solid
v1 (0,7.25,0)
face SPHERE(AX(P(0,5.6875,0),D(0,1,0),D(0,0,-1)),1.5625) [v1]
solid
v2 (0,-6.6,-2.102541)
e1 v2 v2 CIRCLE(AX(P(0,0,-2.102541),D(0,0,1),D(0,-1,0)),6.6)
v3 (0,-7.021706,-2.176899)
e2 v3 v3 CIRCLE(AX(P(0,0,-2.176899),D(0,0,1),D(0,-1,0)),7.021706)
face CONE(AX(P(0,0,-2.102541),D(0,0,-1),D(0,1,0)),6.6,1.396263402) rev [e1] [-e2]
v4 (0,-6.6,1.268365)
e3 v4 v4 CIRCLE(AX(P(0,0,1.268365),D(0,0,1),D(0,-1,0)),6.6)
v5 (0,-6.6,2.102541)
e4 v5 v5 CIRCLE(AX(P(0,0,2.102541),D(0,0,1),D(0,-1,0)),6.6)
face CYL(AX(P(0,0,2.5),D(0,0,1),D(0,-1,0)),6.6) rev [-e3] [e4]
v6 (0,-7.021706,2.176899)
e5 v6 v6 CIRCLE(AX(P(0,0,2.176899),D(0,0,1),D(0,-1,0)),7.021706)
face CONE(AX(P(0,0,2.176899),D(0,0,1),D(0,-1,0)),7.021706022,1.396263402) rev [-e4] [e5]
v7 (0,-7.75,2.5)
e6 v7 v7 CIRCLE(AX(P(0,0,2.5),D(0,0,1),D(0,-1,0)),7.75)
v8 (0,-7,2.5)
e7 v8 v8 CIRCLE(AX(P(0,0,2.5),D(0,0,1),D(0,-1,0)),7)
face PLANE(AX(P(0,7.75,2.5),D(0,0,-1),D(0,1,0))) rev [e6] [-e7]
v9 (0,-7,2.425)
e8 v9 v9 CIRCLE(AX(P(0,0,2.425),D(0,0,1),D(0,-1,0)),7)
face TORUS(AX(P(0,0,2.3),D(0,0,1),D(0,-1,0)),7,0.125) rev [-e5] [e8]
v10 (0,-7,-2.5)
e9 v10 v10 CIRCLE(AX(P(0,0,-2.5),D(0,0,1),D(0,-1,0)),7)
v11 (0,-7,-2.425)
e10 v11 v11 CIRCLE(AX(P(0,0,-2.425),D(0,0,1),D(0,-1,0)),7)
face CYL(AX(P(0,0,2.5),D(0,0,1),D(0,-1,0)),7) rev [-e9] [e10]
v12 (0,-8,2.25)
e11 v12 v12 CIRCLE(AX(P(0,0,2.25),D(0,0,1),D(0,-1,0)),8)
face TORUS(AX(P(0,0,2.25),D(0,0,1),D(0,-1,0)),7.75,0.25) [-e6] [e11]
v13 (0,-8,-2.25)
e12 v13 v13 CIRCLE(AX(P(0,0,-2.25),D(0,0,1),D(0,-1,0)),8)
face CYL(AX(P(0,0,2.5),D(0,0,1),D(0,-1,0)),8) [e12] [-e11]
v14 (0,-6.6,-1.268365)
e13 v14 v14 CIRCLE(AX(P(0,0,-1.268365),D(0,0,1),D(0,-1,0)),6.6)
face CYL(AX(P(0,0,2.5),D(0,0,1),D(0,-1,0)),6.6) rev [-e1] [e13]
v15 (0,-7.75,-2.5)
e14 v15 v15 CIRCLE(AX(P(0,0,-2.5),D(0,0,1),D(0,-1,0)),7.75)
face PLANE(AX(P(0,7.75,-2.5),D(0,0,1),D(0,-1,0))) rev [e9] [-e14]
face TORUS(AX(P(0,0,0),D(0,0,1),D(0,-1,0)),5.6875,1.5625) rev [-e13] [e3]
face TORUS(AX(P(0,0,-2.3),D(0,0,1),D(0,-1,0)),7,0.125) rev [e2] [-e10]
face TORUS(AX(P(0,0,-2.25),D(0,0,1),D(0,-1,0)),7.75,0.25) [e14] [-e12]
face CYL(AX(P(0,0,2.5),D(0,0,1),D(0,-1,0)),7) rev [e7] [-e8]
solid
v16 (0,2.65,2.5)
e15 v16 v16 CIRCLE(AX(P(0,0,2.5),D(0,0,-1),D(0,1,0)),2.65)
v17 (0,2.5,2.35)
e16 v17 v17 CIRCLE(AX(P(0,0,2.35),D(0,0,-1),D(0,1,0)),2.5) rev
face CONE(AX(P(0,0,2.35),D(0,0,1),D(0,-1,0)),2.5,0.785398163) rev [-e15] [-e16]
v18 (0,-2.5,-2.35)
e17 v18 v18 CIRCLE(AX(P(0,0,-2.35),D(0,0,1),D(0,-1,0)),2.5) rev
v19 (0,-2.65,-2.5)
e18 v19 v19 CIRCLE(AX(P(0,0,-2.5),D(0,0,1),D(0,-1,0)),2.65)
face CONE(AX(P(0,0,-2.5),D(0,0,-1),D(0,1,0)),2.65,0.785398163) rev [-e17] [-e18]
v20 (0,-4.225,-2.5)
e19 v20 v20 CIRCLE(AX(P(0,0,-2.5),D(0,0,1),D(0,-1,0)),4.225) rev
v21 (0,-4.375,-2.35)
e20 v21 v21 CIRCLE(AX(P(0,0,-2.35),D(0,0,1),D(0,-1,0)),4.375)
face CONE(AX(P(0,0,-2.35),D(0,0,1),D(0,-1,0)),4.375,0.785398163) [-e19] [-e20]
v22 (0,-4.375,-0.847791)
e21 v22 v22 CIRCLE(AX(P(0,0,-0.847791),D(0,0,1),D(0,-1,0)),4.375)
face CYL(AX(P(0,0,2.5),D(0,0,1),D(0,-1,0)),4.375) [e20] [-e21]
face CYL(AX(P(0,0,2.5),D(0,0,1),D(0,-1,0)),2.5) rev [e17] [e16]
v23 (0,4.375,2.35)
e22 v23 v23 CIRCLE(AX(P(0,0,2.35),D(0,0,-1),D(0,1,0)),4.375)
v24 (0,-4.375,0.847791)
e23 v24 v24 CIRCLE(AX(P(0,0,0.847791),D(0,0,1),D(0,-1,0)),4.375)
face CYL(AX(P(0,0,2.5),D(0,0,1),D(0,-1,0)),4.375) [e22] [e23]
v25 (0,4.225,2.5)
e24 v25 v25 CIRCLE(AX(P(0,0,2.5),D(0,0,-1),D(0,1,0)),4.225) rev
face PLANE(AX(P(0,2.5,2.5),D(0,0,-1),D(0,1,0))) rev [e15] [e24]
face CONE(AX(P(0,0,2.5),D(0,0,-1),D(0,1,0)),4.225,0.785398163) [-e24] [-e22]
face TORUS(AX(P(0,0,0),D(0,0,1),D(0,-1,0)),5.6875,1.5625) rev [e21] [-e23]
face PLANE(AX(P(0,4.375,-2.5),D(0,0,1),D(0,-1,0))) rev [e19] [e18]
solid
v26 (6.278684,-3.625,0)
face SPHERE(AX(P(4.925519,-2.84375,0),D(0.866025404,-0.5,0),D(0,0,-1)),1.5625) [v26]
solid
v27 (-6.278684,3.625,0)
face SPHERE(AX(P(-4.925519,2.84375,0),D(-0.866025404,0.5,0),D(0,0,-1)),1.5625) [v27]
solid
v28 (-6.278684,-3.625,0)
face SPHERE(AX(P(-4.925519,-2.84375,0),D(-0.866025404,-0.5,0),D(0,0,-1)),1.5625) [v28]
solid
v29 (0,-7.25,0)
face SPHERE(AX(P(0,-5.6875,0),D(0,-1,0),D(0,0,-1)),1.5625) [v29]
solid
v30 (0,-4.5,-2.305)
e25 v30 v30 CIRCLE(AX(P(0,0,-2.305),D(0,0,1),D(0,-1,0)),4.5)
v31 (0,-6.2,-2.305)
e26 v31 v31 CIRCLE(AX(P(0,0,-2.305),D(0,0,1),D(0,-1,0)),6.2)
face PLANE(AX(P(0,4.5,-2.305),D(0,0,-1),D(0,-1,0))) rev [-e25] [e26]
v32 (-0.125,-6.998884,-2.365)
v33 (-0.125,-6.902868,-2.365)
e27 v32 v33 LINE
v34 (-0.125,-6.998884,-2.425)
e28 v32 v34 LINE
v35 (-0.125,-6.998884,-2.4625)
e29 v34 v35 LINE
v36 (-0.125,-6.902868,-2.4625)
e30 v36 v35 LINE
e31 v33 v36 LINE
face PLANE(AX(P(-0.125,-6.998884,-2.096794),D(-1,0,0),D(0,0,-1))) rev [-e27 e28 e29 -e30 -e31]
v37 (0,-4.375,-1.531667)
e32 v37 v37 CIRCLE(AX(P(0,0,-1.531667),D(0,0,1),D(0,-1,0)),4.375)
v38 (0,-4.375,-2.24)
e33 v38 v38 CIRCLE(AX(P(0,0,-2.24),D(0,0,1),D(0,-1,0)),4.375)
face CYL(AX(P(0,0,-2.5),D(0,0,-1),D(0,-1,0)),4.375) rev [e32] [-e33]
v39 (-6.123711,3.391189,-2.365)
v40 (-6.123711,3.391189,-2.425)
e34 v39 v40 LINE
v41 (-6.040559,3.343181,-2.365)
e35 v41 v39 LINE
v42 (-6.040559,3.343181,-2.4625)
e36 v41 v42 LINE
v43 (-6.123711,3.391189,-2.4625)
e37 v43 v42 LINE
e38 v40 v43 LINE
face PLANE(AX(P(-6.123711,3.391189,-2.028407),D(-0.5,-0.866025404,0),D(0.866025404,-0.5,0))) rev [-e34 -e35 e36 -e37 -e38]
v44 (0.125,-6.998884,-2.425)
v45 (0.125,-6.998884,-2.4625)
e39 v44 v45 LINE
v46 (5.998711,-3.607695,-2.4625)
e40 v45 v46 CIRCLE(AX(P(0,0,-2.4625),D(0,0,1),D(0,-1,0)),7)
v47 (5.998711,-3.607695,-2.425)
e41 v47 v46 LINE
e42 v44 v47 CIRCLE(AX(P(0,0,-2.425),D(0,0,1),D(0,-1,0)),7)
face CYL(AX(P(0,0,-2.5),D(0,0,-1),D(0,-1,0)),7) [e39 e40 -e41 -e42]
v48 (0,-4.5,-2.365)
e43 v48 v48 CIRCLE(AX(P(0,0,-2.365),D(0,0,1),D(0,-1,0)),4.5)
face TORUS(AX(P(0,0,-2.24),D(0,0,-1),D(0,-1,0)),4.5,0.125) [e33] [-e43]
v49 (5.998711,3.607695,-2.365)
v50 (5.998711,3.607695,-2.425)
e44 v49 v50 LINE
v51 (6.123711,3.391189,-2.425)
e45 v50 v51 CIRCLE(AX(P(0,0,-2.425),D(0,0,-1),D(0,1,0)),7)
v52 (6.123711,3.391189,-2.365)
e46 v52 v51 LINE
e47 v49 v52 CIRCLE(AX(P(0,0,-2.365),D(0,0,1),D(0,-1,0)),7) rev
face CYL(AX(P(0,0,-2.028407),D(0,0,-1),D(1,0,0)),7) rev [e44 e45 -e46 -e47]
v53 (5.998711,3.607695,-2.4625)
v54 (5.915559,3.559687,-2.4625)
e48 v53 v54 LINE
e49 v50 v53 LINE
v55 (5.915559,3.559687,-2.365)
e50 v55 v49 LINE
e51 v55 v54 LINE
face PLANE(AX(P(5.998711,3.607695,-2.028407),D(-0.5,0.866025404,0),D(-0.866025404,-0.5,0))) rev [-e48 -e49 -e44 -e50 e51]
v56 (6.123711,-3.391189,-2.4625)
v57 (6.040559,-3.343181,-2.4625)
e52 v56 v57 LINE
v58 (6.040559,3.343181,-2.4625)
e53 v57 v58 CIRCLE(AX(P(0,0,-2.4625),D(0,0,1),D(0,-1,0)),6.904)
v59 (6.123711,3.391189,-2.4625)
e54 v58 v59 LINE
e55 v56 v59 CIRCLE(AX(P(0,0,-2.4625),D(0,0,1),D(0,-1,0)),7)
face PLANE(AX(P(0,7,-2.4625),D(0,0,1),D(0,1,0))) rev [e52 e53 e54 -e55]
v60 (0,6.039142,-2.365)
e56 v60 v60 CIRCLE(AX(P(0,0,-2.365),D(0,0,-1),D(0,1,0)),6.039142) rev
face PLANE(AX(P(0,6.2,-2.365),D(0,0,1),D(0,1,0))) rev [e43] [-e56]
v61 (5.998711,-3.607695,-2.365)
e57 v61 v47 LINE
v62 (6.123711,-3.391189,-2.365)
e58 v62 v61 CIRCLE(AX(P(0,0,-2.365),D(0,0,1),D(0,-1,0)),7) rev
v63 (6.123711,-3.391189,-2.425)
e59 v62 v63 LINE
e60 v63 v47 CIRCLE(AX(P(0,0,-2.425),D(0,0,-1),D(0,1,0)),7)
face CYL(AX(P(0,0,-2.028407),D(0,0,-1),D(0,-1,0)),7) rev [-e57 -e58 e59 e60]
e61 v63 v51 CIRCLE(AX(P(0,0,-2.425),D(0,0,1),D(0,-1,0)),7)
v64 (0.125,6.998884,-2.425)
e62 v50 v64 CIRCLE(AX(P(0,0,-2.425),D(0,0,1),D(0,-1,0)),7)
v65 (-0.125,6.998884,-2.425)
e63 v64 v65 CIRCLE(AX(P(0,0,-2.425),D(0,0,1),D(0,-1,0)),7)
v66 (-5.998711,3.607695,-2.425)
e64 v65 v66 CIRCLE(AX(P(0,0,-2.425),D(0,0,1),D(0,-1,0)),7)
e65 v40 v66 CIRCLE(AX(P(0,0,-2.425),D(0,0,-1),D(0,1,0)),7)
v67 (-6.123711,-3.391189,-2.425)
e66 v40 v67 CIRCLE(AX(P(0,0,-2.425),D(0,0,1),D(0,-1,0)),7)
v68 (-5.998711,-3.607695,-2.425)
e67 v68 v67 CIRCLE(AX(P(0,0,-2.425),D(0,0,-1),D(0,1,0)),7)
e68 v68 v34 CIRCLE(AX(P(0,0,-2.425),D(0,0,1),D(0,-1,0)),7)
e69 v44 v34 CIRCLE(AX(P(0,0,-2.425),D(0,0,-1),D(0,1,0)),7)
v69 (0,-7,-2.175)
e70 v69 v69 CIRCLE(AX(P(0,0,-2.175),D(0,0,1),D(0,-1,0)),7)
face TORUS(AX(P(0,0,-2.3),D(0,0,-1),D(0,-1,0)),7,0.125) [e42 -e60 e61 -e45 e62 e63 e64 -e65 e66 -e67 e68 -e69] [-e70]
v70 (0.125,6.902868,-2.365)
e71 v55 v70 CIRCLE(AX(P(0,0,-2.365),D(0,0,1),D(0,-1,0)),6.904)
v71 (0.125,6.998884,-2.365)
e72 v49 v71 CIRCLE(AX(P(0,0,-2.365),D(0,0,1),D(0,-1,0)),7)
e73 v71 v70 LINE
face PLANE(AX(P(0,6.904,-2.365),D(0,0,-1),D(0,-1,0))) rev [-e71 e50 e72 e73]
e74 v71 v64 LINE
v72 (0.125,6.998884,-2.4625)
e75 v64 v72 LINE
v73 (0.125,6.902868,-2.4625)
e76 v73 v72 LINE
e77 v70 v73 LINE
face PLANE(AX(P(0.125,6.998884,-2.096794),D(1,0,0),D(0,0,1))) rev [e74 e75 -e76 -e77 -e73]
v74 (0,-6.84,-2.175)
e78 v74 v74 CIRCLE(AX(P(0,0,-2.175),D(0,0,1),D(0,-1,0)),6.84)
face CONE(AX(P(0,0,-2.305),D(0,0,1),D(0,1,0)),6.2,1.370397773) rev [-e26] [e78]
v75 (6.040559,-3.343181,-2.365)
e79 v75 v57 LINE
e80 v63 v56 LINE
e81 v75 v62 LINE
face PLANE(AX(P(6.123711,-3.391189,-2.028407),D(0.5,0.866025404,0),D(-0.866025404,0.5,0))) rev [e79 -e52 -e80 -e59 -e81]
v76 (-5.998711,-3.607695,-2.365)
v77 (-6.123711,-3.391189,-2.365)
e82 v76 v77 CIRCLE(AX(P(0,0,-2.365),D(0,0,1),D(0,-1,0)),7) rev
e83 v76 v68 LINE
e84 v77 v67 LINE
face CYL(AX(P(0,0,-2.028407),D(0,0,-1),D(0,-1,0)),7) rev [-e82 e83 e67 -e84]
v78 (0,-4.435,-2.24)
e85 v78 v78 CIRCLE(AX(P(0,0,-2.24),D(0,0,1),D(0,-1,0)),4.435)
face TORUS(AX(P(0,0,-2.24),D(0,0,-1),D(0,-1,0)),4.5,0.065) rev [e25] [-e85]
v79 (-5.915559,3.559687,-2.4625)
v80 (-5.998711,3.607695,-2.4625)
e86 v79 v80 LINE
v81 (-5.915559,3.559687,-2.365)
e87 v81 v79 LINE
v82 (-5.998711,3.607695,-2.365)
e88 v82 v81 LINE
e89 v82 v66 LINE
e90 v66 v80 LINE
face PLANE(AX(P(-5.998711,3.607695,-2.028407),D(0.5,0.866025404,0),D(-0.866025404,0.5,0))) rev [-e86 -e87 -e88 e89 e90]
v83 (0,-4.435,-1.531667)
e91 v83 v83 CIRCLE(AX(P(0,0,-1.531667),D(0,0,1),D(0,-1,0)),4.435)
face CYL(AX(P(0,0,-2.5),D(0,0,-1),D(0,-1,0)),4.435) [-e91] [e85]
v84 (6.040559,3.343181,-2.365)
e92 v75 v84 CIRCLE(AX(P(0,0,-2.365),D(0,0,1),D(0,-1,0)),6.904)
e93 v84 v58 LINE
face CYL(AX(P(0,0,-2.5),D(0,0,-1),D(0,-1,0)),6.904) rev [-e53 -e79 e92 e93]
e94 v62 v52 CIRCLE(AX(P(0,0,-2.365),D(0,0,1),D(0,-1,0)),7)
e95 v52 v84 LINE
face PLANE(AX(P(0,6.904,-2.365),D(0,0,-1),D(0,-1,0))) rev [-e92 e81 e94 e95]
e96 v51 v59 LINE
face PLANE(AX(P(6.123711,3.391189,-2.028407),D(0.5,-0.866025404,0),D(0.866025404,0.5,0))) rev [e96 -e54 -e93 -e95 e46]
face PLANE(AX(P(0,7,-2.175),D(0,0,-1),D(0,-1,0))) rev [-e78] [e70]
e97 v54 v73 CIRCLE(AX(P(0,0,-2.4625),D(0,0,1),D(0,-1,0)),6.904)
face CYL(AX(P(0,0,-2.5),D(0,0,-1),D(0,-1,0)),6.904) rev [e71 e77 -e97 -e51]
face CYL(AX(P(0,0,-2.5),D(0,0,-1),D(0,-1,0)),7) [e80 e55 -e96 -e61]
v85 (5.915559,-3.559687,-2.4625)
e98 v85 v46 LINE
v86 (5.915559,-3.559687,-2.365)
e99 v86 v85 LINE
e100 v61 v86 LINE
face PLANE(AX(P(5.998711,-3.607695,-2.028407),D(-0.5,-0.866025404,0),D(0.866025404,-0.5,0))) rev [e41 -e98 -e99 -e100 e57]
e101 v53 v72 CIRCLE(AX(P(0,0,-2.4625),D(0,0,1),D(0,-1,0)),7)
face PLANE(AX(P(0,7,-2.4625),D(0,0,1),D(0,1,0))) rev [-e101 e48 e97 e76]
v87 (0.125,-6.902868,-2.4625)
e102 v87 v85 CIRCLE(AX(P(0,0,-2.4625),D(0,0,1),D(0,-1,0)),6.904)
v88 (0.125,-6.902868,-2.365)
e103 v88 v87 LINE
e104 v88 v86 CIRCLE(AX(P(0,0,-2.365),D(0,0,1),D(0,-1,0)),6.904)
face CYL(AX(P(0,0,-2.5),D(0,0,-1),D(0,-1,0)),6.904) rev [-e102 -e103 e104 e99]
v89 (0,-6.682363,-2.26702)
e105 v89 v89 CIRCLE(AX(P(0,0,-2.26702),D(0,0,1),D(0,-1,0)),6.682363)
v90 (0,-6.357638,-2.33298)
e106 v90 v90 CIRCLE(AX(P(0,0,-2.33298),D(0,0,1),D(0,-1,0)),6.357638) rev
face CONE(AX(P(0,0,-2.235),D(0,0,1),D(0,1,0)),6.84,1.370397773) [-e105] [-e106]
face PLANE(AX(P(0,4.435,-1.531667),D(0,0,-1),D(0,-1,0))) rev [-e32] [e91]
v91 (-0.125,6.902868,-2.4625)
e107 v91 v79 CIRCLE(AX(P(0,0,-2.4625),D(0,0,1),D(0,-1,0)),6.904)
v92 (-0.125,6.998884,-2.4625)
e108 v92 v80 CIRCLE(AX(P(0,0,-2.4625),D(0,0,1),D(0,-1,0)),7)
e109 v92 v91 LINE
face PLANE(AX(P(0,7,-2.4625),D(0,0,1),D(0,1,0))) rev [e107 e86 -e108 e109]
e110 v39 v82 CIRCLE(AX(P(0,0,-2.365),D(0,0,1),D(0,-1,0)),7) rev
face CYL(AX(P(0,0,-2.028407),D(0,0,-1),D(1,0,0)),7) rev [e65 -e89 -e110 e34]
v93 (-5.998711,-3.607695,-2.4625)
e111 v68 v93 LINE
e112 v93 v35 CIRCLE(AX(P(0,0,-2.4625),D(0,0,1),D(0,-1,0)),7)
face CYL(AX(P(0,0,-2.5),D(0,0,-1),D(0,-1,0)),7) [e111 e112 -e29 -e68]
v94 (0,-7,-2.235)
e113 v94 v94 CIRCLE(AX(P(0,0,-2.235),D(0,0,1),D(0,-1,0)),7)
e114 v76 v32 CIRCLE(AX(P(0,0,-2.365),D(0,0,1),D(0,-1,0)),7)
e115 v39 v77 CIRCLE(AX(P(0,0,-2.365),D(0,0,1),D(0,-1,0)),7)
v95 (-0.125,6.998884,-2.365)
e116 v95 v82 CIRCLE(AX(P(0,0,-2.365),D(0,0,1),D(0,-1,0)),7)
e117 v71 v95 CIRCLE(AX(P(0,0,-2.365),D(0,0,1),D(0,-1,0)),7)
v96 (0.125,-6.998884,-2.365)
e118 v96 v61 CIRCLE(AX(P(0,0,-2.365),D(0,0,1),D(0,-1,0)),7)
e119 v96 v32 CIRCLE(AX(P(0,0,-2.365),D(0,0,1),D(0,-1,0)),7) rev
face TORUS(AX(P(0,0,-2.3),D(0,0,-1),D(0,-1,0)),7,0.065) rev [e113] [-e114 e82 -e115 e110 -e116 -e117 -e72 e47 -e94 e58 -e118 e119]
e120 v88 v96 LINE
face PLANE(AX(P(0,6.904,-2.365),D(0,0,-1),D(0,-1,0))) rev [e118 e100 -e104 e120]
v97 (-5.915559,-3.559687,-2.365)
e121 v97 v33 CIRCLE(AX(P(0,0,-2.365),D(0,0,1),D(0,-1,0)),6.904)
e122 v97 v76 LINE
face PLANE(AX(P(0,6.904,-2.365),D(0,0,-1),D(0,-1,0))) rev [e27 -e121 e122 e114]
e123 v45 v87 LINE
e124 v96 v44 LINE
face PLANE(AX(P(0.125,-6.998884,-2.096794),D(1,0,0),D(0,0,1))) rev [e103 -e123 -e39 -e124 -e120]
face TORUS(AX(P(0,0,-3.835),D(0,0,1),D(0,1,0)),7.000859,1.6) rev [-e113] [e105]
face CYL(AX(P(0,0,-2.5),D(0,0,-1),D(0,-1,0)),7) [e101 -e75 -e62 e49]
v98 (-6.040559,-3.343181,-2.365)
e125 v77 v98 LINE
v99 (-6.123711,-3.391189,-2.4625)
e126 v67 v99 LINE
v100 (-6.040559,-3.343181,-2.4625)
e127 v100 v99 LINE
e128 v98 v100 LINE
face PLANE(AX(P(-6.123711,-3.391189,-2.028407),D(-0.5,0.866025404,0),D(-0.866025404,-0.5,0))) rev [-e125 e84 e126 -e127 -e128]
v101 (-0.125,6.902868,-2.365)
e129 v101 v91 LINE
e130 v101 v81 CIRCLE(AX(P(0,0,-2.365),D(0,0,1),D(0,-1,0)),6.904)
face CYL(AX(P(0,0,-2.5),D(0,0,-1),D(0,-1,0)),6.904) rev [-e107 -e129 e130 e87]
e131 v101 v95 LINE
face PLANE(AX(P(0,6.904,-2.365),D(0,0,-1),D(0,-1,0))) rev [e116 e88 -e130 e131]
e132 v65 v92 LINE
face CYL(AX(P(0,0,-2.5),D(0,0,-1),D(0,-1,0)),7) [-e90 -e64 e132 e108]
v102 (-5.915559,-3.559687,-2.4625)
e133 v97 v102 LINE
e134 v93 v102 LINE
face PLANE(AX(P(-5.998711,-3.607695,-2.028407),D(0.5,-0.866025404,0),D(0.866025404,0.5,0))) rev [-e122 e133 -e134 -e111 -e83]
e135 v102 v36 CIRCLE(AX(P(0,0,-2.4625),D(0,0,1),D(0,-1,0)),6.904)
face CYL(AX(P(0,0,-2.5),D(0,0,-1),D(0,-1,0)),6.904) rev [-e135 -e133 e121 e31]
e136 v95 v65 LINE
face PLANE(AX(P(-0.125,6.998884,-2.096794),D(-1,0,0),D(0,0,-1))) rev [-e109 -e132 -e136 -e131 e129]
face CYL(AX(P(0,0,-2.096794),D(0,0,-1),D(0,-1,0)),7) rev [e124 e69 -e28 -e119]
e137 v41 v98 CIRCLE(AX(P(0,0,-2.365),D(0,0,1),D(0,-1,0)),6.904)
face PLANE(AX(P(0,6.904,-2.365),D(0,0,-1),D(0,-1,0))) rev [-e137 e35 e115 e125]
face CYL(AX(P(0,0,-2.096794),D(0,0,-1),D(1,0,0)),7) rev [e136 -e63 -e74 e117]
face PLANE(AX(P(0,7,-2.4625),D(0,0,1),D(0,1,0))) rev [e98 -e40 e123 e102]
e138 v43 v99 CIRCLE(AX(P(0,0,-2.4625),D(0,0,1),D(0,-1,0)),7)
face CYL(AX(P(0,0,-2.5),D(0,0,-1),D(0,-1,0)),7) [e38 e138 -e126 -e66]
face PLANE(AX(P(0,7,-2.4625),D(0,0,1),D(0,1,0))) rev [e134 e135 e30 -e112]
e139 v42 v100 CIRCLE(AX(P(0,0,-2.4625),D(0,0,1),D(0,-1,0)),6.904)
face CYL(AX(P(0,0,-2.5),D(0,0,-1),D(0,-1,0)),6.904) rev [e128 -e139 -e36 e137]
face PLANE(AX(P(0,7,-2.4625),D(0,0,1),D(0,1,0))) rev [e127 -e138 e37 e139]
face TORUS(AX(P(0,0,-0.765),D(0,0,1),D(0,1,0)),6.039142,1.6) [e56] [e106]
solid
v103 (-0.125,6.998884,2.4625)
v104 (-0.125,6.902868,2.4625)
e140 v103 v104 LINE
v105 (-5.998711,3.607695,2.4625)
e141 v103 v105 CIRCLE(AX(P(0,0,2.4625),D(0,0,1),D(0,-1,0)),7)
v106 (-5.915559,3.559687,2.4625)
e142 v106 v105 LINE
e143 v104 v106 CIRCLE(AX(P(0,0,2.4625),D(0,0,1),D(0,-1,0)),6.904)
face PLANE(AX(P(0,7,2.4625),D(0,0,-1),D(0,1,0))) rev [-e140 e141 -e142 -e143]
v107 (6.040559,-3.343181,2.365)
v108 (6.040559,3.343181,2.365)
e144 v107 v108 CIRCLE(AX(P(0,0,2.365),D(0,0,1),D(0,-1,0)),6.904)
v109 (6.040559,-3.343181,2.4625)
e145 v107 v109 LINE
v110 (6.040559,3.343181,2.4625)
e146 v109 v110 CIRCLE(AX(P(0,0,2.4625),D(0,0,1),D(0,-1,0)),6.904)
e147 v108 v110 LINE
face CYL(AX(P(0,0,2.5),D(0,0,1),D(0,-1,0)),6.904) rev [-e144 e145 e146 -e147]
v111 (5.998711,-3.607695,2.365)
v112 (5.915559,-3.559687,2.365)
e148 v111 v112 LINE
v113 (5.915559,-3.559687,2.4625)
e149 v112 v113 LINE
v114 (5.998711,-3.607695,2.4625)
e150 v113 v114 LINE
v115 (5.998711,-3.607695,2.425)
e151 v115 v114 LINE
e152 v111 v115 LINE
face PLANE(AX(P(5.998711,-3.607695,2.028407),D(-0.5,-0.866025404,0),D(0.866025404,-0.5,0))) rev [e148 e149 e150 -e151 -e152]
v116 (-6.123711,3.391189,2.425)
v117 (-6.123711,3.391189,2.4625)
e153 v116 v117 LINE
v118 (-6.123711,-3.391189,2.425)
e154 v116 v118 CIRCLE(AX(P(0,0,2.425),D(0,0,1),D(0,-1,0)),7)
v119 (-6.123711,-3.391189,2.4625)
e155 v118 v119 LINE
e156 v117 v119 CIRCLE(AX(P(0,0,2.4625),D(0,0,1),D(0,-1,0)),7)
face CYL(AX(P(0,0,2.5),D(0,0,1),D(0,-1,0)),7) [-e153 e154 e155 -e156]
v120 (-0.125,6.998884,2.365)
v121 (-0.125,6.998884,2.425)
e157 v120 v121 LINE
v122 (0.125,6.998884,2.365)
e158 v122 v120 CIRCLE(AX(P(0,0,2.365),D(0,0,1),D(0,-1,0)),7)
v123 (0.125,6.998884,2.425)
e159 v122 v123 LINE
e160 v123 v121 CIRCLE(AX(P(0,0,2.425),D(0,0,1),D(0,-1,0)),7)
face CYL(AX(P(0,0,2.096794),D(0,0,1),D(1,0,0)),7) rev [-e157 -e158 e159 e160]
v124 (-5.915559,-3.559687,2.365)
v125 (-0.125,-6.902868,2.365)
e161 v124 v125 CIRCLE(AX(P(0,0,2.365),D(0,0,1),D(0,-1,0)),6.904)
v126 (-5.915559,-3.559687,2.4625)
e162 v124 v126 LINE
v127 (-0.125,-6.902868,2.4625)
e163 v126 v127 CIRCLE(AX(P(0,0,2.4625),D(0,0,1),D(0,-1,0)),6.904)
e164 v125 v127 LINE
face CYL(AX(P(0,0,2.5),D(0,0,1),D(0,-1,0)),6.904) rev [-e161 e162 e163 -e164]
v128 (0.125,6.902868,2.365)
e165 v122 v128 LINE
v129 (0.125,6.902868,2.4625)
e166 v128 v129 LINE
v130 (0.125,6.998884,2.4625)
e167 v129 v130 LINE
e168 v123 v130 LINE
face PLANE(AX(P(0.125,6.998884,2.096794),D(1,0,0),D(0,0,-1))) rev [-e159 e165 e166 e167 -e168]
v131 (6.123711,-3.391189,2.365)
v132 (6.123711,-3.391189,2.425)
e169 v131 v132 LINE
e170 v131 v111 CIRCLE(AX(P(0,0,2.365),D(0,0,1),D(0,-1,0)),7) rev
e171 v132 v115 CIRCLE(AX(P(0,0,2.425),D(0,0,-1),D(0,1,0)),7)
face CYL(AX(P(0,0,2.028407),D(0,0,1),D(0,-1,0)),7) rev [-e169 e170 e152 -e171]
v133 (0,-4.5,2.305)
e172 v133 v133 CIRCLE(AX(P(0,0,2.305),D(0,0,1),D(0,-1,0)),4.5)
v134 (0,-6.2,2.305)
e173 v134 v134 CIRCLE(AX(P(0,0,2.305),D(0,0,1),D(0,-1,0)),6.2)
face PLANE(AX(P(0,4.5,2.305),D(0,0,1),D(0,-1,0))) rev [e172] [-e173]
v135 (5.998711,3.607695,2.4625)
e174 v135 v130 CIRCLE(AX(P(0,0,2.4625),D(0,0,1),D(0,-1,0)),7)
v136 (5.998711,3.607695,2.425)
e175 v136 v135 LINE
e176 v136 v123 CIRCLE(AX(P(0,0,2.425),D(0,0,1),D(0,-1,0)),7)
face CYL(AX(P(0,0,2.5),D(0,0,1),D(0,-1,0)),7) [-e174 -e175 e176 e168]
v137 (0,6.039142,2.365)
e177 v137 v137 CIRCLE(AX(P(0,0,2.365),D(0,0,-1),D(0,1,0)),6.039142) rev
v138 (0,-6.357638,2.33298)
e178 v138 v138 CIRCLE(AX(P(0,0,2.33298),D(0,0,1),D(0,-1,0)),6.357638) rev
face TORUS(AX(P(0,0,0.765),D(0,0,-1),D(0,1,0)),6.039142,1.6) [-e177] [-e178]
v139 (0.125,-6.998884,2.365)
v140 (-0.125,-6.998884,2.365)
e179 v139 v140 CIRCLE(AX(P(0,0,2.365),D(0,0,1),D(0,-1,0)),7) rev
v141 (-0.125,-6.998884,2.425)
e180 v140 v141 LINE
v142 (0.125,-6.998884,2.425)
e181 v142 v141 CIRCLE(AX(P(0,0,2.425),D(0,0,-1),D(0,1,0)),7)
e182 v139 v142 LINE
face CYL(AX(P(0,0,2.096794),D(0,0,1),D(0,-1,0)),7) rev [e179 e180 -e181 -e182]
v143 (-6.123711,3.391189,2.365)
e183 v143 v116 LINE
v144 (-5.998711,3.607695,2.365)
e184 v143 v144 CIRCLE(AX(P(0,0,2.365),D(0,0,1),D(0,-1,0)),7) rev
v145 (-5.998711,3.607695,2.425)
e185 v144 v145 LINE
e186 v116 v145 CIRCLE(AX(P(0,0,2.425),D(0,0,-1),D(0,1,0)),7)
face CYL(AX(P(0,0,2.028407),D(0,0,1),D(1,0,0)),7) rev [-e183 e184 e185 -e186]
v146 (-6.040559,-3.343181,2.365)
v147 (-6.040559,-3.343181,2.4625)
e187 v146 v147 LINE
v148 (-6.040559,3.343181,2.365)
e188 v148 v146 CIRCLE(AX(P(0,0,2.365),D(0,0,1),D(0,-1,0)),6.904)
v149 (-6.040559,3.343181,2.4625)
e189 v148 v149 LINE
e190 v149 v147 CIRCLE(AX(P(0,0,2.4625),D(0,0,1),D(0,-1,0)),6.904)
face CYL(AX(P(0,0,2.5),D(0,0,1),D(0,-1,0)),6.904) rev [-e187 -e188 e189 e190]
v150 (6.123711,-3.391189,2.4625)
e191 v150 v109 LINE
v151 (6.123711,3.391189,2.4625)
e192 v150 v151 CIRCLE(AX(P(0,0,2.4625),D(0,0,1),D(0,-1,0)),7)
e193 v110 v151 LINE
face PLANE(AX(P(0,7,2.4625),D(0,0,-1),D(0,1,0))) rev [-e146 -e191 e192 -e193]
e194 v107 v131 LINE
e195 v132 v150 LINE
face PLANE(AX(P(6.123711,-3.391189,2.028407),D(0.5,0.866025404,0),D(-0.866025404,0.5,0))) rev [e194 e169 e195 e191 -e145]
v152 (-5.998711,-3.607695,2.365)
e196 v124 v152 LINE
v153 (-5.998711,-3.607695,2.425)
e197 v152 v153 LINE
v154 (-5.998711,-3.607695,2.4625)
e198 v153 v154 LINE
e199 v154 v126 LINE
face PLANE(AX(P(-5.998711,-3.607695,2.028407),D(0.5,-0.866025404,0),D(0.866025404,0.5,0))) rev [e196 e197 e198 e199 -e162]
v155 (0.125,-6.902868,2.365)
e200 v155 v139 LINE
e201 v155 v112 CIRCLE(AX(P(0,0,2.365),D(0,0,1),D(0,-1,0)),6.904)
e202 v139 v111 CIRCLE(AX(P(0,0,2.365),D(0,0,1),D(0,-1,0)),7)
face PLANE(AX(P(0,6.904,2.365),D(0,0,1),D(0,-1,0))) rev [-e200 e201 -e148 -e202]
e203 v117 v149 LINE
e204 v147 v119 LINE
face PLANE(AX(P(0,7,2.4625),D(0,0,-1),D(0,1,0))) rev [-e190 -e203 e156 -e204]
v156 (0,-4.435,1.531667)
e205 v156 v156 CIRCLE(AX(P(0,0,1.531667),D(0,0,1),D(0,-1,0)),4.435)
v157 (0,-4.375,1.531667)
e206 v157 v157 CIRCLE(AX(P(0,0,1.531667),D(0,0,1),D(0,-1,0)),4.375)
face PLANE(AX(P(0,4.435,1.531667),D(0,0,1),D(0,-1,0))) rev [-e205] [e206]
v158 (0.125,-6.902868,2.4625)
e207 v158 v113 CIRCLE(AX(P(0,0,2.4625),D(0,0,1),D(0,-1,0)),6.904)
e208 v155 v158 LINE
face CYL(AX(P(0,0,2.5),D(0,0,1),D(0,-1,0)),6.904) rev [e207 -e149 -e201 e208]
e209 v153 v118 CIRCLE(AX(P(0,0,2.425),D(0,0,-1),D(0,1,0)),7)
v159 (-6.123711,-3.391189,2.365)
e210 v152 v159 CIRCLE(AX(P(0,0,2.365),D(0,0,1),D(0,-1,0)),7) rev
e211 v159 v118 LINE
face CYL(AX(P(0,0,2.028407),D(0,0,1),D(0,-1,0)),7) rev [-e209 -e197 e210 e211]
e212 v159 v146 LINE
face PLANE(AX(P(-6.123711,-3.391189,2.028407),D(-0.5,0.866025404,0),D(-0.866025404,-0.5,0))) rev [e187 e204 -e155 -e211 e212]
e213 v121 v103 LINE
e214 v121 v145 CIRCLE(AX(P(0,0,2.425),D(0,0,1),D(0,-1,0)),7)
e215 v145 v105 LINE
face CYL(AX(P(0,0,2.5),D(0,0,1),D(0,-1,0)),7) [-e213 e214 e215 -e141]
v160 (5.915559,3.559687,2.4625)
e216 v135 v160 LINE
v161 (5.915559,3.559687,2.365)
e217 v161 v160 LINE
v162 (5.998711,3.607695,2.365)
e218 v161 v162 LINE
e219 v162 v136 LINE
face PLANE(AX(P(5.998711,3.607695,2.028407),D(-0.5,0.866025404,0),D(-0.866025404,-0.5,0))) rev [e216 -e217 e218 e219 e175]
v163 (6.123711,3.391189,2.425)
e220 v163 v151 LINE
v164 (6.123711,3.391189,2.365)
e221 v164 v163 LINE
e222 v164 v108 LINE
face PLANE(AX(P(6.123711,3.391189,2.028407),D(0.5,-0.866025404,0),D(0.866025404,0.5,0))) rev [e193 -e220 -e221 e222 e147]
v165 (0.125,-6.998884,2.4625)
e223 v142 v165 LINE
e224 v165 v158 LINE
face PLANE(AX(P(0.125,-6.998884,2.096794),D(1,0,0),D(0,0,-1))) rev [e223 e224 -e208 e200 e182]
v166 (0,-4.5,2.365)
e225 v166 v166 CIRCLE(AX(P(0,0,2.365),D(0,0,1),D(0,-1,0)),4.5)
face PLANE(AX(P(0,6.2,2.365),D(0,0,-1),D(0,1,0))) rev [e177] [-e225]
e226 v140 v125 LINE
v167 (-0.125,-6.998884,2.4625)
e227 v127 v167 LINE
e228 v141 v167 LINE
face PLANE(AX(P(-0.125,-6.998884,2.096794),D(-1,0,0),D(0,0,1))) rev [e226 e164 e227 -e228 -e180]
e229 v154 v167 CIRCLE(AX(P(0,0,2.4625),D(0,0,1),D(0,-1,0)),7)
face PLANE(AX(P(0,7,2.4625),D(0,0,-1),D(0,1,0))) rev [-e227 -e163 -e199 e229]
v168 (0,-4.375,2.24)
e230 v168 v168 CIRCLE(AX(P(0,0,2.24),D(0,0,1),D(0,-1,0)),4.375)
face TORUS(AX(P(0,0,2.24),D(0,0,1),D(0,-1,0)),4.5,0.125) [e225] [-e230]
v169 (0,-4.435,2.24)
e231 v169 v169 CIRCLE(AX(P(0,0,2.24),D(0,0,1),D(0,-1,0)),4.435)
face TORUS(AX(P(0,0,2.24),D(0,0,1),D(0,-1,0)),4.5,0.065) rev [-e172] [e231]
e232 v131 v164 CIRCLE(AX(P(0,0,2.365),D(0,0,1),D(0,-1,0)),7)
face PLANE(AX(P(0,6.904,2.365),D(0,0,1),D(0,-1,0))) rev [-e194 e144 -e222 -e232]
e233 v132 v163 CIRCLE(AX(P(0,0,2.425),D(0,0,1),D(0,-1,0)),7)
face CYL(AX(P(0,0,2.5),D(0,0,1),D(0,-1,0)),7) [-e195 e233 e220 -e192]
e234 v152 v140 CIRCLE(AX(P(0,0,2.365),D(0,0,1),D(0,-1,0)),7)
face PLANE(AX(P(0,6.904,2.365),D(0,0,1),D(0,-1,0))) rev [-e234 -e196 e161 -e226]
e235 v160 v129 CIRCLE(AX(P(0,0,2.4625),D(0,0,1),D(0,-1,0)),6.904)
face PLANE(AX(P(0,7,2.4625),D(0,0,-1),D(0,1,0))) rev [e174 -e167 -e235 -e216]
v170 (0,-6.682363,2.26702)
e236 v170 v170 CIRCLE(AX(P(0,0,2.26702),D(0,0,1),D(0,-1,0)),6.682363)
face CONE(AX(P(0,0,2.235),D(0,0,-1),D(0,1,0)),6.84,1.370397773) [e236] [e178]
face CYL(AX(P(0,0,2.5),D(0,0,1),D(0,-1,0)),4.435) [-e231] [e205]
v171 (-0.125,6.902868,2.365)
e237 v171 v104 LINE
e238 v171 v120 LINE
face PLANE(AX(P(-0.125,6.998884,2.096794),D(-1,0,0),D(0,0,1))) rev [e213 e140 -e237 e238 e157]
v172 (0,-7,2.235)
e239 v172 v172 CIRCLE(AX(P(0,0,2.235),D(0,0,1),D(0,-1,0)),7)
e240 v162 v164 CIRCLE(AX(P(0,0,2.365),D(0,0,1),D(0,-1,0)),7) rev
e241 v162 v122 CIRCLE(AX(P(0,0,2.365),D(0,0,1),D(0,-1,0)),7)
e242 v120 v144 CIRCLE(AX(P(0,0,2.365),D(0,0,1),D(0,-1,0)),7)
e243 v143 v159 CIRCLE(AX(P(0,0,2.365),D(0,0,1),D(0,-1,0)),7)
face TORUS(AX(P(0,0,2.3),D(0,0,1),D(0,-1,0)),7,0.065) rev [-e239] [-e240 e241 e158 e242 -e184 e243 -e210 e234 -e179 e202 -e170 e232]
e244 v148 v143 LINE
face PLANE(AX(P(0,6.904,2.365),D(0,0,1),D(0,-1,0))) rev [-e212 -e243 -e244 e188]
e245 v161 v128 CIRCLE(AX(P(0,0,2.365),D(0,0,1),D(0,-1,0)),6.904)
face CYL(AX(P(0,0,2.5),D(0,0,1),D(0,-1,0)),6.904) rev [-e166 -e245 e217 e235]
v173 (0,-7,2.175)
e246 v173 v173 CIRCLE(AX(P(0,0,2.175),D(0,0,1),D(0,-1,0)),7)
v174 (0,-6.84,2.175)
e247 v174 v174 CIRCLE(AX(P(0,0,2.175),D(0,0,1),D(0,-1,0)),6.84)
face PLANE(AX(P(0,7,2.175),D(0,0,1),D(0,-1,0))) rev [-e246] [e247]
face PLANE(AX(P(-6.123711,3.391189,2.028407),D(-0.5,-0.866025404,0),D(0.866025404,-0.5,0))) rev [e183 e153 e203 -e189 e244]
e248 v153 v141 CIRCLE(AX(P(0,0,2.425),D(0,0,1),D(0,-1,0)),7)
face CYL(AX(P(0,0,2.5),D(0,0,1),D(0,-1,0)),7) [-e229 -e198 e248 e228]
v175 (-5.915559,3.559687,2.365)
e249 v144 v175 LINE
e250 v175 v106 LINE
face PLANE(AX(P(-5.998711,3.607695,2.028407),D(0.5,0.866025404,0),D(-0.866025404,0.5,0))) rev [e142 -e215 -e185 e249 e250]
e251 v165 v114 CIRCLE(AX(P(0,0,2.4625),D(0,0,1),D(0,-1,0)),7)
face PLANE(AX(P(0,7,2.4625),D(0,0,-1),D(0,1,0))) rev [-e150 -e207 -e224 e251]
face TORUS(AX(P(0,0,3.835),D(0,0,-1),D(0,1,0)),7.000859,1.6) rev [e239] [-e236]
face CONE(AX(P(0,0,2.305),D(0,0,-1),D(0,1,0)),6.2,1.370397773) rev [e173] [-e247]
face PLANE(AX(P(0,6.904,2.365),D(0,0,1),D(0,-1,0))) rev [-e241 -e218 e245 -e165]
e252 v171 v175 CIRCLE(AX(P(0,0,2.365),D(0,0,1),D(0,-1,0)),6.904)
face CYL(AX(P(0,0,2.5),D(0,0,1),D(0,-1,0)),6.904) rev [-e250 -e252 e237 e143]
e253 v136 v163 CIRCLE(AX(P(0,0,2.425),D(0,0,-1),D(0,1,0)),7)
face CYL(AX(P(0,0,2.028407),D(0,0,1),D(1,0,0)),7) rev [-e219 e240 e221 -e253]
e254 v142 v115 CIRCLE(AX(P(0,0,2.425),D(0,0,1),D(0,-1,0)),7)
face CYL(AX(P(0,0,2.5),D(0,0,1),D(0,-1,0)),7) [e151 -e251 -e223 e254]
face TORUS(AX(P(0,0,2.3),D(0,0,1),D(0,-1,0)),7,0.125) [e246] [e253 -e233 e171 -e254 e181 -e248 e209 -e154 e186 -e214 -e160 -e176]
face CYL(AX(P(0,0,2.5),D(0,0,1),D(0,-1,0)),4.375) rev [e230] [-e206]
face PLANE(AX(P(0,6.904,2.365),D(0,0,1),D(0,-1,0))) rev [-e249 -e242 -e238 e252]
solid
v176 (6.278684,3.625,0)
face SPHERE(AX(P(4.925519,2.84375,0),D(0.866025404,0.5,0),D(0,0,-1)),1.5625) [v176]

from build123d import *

# Parameters (mm, degrees)
CHAMFER1_SIZE      = 0.15
CIRPATTERN1_COUNT  = 6
CUT_EXTRUDE1_REACH = 14.354
CIRPATTERN2_COUNT  = 6


with BuildPart() as part:
    # Sketch3 → Revolve1 (revolve)
    with BuildSketch(Plane(origin=(0, 0, 0), x_dir=(0, 0, -1), z_dir=(1, 0, 0)), mode=Mode.PRIVATE) as revolve1_sk:
        with BuildLine():
            Line((-2.5, 2.5), (2.5, 2.5))
            Line((2.5, 2.5), (2.5, 4.375))
            Line((2.5, 4.375), (0.847791248, 4.375))
            ThreePointArc((0.847791248, 4.375), (0, 4.125), (-0.847791248, 4.375))
            Line((-0.847791248, 4.375), (-2.5, 4.375))
            Line((-2.5, 4.375), (-2.5, 2.5))
        make_face()
        with BuildLine():
            Line((2.5, 7), (2.425, 7))
            ThreePointArc((2.425, 7), (2.310894468, 7.124524337), (2.176899031, 7.021706022))
            Line((2.176899031, 7.021706022), (2.102540881, 6.6))
            Line((2.102540881, 6.6), (1.268365089, 6.6))
            ThreePointArc((1.268365089, 6.6), (0, 7.25), (-1.268365089, 6.6))
            Line((-1.268365089, 6.6), (-2.102540881, 6.6))
            Line((-2.102540881, 6.6), (-2.176899031, 7.021706022))
            ThreePointArc((-2.176899031, 7.021706022), (-2.310894468, 7.124524337), (-2.425, 7))
            Line((-2.425, 7), (-2.5, 7))
            Line((-2.5, 7), (-2.5, 7.75))
            ThreePointArc((-2.5, 7.75), (-2.426776695, 7.926776695), (-2.25, 8))
            Line((-2.25, 8), (2.25, 8))
            ThreePointArc((2.25, 8), (2.426776695, 7.926776695), (2.5, 7.75))
            Line((2.5, 7.75), (2.5, 7))
        make_face()
    revolve(revolve1_sk.sketch.rotate(Axis((0, 0, 2.5), (0, 0, -1)), 180), axis=Axis((0, 0, 2.5), (0, 0, -1)))

    # Chamfer1
    chamfer1_edges = [part.edges().sort_by_distance(p)[0] for p in [
        (0, 4.375, 2.5),
        (0, 4.375, -2.5),
        (0, 2.5, -2.5),
        (0, 2.5, 2.5),
    ]]
    chamfer(chamfer1_edges, length=CHAMFER1_SIZE)


with BuildPart() as body_2:
    # Sketch4 → Revolve2 (revolve)
    with BuildSketch(Plane(origin=(0, 0, 0), x_dir=(0, 0, -1), z_dir=(1, 0, 0)), mode=Mode.PRIVATE) as revolve2_sk:
        with BuildLine():
            Line((-2.425, 7), (-2.4625, 7))
            Line((-2.4625, 7), (-2.4625, 6.904))
            Line((-2.4625, 6.904), (-2.365, 6.904))
            Line((-2.365, 6.904), (-2.365, 7))
            ThreePointArc((-2.365, 7), (-2.3, 7.065), (-2.235, 7))
            Line((-2.235, 7), (-2.235, 6.84))
            Line((-2.235, 6.84), (-2.365, 6.2))
            Line((-2.365, 6.2), (-2.365, 4.5))
            ThreePointArc((-2.365, 4.5), (-2.328388348, 4.411611652), (-2.24, 4.375))
            Line((-2.24, 4.375), (-1.531666667, 4.375))
            Line((-1.531666667, 4.375), (-1.531666667, 4.435))
            Line((-1.531666667, 4.435), (-2.24, 4.435))
            ThreePointArc((-2.24, 4.435), (-2.285961941, 4.454038059), (-2.305, 4.5))
            Line((-2.305, 4.5), (-2.305, 6.2))
            Line((-2.305, 6.2), (-2.175, 6.84))
            Line((-2.175, 6.84), (-2.175, 7))
            ThreePointArc((-2.175, 7), (-2.3, 7.125), (-2.425, 7))
        make_face()
    revolve(revolve2_sk.sketch.rotate(Axis((0, 0, 2.5), (0, 0, -1)), 180), axis=Axis((0, 0, 2.5), (0, 0, -1)))

    # Fillet1: read off the stored shape, not the designer's step
    # Fillet1 outline → Fillet1 (revolve, cut)
    with BuildSketch(Plane.XZ):
        with BuildLine():
            Line((6.357638344, 2.365), (6.039142465, 2.365))
            ThreePointArc((6.039142465, 2.365), (6.199193179, 2.356974802), (6.357638344, 2.332979711))
            Line((6.357638344, 2.332979711), (6.357638344, 2.365))
        make_face()
    revolve(axis=Axis((0, 0, 0), (0, 0, 1)), mode=Mode.SUBTRACT)

    # Fillet1 2 outline → Fillet1 2 (revolve)
    with BuildSketch(Plane.XZ):
        with BuildLine():
            ThreePointArc((7, 2.235), (6.84038078, 2.243067972), (6.68236279, 2.267020058))
            Line((6.68236279, 2.267020058), (6.68236279, 2.235))
            Line((6.68236279, 2.235), (7, 2.235))
        make_face()
    revolve(axis=Axis((0, 0, 0), (0, 0, 1)))

    # Cut-Extrude1: up to this face of the body (flat: up to its plane)
    cut_extrude1_end = Plane(body_2.part.faces().sort_by_distance((0, 6.92379899, 2.365))[0])
    # Sketch6 → Cut-Extrude1 (cut, up to the picked face)
    with BuildSketch(Plane.XY.offset(2.4625), mode=Mode.PRIVATE) as cut_extrude1_sk1:
        with BuildLine():
            Line((-0.125, 6.99888384), (-0.125, 6.902868317))
            ThreePointArc((-0.125, 6.902868317), (0, 6.904), (0.125, 6.902868317))
            Line((0.125, 6.902868317), (0.125, 6.99888384))
            ThreePointArc((0.125, 6.99888384), (0, 7), (-0.125, 6.99888384))
        make_face()
    cut_extrude1_tool1 = split(extrude(cut_extrude1_sk1.sketch, amount=-CUT_EXTRUDE1_REACH, mode=Mode.PRIVATE), bisect_by=cut_extrude1_end, keep=Keep.BOTH, mode=Mode.PRIVATE)
    cut_extrude1 = cut_extrude1_tool1.solids().sort_by(Axis((0, 6.951625, 2.4625), (0, 0, -1)))[0]
    add(cut_extrude1, mode=Mode.SUBTRACT)

    # CirPattern2: Cut-Extrude1 ×6 about axis
    cirpattern2_axis = Axis((0, 0, 0), (0, 0, 1))
    for i in range(1, CIRPATTERN2_COUNT):
        add(cut_extrude1.rotate(cirpattern2_axis, i * 360 / CIRPATTERN2_COUNT), mode=Mode.SUBTRACT)


with BuildPart() as body_3:
    # Sketch5 → Revolve3 (revolve)
    with BuildSketch(Plane(origin=(0, 0, 0), x_dir=(0, 0, -1), z_dir=(1, 0, 0))):
        with BuildLine():
            Line((0, 7.25), (0, 4.125))
            ThreePointArc((0, 4.125), (1.5625, 5.6875), (0, 7.25))
        make_face()
    revolve(axis=Axis((0, 7.25, 0), (0, -1, 0)))


with BuildPart() as cirpattern1_1:
    # CirPattern1: pattern copy
    add(body_3.part.rotate(Axis((0, 0, 0), (0, 0, 1)), 1 * 360 / CIRPATTERN1_COUNT))


with BuildPart() as cirpattern1_2:
    # CirPattern1: pattern copy
    add(body_3.part.rotate(Axis((0, 0, 0), (0, 0, 1)), 2 * 360 / CIRPATTERN1_COUNT))


with BuildPart() as cirpattern1_3:
    # CirPattern1: pattern copy
    add(body_3.part.rotate(Axis((0, 0, 0), (0, 0, 1)), 3 * 360 / CIRPATTERN1_COUNT))


with BuildPart() as cirpattern1_4:
    # CirPattern1: pattern copy
    add(body_3.part.rotate(Axis((0, 0, 0), (0, 0, 1)), 4 * 360 / CIRPATTERN1_COUNT))


with BuildPart() as cirpattern1_5:
    # CirPattern1: pattern copy
    add(body_3.part.rotate(Axis((0, 0, 0), (0, 0, 1)), 5 * 360 / CIRPATTERN1_COUNT))


with BuildPart() as body_9:
    # Mirror2: mirrored copy
    add(body_2.part.mirror(Plane.XY))


solid = Compound([part.part, body_2.part, body_3.part, cirpattern1_1.part, cirpattern1_2.part, cirpattern1_3.part, cirpattern1_4.part, cirpattern1_5.part, body_9.part])
